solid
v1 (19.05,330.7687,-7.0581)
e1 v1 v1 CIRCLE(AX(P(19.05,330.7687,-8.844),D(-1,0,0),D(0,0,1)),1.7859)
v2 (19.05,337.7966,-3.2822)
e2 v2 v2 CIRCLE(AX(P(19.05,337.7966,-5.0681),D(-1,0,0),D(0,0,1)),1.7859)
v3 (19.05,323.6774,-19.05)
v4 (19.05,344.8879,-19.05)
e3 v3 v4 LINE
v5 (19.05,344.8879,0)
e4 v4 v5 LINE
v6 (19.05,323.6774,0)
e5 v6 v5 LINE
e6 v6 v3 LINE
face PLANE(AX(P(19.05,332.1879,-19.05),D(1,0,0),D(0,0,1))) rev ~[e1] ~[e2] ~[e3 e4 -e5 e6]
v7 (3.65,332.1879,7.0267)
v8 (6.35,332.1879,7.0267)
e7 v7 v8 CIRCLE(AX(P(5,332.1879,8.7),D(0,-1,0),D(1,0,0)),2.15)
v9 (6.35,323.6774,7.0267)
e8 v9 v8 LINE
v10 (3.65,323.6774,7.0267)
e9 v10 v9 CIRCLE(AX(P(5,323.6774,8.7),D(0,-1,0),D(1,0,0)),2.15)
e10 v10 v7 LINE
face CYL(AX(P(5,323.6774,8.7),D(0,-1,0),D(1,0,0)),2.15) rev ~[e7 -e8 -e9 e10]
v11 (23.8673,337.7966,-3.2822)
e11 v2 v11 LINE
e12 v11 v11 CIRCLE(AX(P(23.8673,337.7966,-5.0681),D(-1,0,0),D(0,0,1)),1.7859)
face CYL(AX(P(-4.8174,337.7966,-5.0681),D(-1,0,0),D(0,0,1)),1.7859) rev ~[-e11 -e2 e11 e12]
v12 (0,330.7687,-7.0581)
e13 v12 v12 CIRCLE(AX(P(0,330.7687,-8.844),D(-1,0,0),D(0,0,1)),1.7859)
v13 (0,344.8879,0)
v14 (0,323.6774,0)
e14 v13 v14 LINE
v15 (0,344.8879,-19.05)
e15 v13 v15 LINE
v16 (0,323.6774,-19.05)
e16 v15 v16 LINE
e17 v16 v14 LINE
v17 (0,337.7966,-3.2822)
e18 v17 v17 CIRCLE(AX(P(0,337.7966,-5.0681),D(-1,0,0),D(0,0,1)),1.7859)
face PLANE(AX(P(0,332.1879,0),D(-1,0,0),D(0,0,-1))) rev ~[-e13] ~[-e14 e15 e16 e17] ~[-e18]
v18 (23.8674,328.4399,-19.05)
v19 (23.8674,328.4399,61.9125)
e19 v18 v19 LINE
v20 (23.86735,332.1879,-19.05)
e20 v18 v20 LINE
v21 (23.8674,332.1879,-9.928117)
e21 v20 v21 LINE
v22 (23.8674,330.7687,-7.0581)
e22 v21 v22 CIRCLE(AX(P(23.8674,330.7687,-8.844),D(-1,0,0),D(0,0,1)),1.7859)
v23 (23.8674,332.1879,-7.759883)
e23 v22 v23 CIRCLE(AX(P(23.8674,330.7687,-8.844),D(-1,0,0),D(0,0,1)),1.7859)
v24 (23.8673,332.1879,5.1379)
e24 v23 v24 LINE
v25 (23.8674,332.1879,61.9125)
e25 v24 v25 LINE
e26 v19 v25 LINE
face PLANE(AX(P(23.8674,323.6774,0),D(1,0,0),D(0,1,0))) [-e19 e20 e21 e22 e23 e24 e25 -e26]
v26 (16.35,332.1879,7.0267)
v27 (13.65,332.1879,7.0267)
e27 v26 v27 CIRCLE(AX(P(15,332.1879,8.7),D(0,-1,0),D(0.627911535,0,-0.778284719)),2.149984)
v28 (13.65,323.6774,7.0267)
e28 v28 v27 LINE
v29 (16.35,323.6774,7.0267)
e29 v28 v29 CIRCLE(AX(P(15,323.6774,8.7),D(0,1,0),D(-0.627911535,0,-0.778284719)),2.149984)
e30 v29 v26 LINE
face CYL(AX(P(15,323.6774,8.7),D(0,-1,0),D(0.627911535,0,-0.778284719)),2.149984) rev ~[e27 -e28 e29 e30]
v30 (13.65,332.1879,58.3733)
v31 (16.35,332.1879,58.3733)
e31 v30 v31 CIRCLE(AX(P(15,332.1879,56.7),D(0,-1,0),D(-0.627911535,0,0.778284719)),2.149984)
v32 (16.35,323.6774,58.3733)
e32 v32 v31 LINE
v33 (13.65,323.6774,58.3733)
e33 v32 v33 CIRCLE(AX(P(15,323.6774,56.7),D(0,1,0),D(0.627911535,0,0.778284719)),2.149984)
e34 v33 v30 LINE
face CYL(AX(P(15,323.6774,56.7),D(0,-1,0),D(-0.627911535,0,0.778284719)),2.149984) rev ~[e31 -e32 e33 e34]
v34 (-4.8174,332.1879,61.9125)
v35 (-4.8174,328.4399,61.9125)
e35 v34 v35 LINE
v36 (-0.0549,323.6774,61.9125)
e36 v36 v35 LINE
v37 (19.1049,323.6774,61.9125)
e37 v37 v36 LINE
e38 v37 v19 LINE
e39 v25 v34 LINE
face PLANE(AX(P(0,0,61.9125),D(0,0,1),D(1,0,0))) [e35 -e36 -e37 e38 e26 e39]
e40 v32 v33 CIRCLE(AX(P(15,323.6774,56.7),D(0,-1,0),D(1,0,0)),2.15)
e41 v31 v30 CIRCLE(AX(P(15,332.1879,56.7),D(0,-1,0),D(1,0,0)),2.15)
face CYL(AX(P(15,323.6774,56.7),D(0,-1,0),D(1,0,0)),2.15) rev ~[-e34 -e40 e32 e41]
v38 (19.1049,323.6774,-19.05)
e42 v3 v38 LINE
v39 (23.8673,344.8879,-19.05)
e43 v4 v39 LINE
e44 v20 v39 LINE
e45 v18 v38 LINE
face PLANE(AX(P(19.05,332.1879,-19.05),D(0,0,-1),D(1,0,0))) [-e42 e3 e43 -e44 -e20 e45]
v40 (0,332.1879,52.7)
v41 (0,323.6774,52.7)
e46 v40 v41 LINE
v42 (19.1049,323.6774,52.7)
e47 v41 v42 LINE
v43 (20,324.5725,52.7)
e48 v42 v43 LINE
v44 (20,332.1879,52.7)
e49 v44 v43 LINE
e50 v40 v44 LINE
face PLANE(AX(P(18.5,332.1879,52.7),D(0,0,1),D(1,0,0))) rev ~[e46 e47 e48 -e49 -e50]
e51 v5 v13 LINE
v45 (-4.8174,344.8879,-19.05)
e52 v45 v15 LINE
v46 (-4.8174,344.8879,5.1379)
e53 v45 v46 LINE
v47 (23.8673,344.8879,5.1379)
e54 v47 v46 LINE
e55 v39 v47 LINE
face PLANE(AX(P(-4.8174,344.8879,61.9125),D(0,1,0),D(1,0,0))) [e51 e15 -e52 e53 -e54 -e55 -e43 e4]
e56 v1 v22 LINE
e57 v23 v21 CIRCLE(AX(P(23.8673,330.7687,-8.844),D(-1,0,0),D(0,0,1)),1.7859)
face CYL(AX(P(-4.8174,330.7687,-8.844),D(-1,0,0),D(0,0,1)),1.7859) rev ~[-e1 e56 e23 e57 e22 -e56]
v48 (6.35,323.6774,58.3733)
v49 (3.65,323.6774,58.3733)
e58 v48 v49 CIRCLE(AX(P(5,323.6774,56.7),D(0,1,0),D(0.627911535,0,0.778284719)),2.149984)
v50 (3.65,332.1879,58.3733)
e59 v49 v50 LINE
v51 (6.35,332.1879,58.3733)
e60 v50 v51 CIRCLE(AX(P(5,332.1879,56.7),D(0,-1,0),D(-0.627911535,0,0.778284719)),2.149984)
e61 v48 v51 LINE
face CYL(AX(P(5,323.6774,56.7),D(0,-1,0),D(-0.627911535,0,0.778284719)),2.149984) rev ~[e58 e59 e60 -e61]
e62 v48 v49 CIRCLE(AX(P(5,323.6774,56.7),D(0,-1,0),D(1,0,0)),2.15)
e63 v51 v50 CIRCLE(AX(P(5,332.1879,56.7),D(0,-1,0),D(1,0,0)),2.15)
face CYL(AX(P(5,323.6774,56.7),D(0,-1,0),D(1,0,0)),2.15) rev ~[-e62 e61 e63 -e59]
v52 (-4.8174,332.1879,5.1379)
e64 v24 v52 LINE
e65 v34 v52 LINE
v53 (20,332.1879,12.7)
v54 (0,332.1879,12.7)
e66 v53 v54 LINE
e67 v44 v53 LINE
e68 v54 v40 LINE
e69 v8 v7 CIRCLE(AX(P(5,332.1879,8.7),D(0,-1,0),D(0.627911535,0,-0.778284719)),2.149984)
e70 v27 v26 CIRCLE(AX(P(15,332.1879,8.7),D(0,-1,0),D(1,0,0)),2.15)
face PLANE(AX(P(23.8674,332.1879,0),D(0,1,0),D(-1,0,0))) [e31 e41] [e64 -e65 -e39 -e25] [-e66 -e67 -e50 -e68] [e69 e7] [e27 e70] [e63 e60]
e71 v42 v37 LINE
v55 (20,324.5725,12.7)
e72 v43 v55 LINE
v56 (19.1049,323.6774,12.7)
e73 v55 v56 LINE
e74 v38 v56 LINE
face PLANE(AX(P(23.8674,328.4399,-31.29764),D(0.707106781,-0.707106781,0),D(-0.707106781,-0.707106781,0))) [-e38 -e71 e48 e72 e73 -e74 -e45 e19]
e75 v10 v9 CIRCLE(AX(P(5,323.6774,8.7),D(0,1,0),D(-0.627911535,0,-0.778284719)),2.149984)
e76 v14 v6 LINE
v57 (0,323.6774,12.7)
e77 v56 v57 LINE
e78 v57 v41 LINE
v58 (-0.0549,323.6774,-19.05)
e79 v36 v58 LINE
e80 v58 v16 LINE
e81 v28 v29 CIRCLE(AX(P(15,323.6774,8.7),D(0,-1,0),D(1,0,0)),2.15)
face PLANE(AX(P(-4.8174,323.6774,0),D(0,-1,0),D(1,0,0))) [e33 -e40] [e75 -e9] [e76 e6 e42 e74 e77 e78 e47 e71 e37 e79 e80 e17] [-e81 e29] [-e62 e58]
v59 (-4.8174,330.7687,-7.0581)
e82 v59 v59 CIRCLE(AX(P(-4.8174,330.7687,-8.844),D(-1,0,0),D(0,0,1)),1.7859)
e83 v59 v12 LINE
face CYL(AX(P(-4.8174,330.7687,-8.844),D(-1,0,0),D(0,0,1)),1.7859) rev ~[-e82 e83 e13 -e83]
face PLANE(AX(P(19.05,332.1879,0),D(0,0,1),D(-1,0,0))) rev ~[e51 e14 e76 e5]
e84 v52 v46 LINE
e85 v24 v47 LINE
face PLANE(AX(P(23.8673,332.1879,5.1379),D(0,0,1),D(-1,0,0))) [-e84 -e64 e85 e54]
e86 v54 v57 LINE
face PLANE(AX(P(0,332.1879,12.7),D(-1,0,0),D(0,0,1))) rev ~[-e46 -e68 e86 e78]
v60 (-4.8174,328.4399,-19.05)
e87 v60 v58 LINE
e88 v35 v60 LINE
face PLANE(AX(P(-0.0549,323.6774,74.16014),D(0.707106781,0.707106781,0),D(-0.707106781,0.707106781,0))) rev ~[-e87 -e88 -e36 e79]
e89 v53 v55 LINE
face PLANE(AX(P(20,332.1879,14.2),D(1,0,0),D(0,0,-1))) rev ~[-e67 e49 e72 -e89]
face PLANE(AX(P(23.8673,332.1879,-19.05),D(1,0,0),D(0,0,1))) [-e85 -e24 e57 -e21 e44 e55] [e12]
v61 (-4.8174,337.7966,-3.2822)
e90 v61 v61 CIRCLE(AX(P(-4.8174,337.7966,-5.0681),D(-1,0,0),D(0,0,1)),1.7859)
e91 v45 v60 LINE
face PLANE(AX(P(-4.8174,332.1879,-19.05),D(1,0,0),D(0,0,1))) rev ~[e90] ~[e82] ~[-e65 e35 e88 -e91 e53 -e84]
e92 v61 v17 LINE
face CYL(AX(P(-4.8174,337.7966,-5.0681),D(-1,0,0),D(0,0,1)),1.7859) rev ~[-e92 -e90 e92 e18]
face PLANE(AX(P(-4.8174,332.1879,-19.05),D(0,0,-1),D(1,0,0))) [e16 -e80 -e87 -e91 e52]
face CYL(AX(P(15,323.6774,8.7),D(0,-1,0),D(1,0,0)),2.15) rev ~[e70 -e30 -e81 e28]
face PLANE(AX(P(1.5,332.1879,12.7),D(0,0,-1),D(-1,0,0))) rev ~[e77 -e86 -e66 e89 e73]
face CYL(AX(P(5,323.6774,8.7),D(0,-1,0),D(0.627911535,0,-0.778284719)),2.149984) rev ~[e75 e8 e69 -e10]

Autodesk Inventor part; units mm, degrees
ref_plane "YZ Plane" through (0, 0, 0) normal (1, 0, 0) x (0, 1, 0)
ref_plane "Work Plane1" through (0, 0, 0) normal (0, 0, 1) x (1, 0, 0)
ref_plane "Work Plane2" through (0, 0, 0) normal (0, 0, 1) x (1, 0, 0)
sketch "Sketch2" plane through (0, 0, 0) normal (0, 0, 1) x (1, 0, 0)
  line L0 (0, 0) -> (19.05, 0) projected
  line L1 (19.05, 0) -> (19.05, 431.8) construction
  line L2 (0, 431.8) -> (19.05, 431.8) projected
  line L3 (0, 0) -> (0, 431.8) construction
  line L4 (18.5, 323.6774) -> (1.5, 323.6774) projected
  line L5 (18.5, 323.6774) -> (19.1476, 323.6774)
  line L6 (1.5, 323.6774) -> (0, 323.6774)
  line L7 (-4.8174, 323.6774) -> (23.8674, 323.6774)
  line L8 (23.8674, 323.6774) -> (23.8674, 332.1879)
  line L9 (23.8674, 332.1879) -> (-4.8174, 332.1879)
  line L10 (-4.8174, 332.1879) -> (-4.8174, 323.6774)
  line L11 (9.525, 431.8) -> (9.525, 312.4258) construction
  line L12 (9.525, 327.9326) -> (-4.8174, 327.9326) construction
  line L13 (23.8674, 327.9326) -> (9.525, 327.9326) construction
extrude "Extrusion1" add sketch "Sketch2" along normal blind 61.9125
sketch "Sketch3" plane through (-4.8174, 323.6774, 0) normal (0, -1, 0) x (1, 0, 0)
  arc A0 (8.4674, 58.3733) -> (11.1674, 58.3733) centre (9.8174, 56.7) ccw projected
  arc A1 (18.4674, 58.3733) -> (21.1674, 58.3733) centre (19.8174, 56.7) ccw projected
  arc A2 (11.1674, 7.0267) -> (8.4674, 7.0267) centre (9.8174, 8.7) ccw projected
  arc A3 (21.1674, 7.0267) -> (18.4674, 7.0267) centre (19.8174, 8.7) ccw projected
  circle A4 centre (9.8174, 8.7) radius 2.15
  circle A5 centre (19.8174, 8.7) radius 2.15
  circle A6 centre (9.8174, 56.7) radius 2.15
  circle A7 centre (19.8174, 56.7) radius 2.15
  point P0 (4.8174, 0)
extrude "Extrusion2" cut sketch "Sketch3" against normal through all
sketch "Sketch4" plane through (-4.8174, 332.1879, 0) normal (0, 1, 0) x (1, 0, 0)
  line L0 (4.8174, -14.2) -> (4.8174, -51.2) projected
  line L1 (6.3174, -52.7) -> (23.3174, -52.7) projected
  line L2 (24.8174, -51.2) -> (24.8174, -14.2) projected
  line L3 (23.3174, -12.7) -> (6.3174, -12.7) projected
  line L4 (4.8174, -52.7) -> (24.8174, -52.7)
  line L5 (24.8174, -52.7) -> (24.8174, -12.7)
  line L6 (24.8174, -12.7) -> (4.8174, -12.7)
  line L7 (4.8174, -12.7) -> (4.8174, -52.7)
  point P0 (4.8174, 0)
extrude "Extrusion3" cut sketch "Sketch4" against normal through all
sketch "Sketch6" plane through (0, 0, 0) normal (0, 0, -1) x (-1, 0, 0)
  line L0 (4.8174, 323.6774) -> (-23.8674, 323.6774) projected
  line L1 (4.8174, 332.1879) -> (4.8174, 323.6774) projected
  line L2 (-23.8674, 332.1879) -> (4.8174, 332.1879) projected
  line L3 (-23.8674, 323.6774) -> (-23.8674, 332.1879) projected
  point P0 (0, 0)
extrude "Extrusion4" add sketch "Sketch6" along normal blind 19.05
sketch "Sketch7" plane through (-4.8174, 332.1879, 61.9125) normal (0, 1, 0) x (1, 0, 0)
  line L0 (4.8174, 70.6755) -> (4.8174, 80.9625) projected
  line L1 (4.8174, 61.9125) -> (4.8174, 70.6755) projected
  line L2 (23.8674, 61.9125) -> (23.8674, 70.6755) projected
  line L3 (23.8674, 71.4375) -> (23.8674, 80.9625) projected
  line L4 (23.8674, 61.9125) -> (4.8174, 61.9125)
  line L5 (4.8174, 61.9125) -> (4.8174, 80.9625)
  line L6 (4.8174, 80.9625) -> (23.8674, 80.9625)
  line L7 (23.8674, 80.9625) -> (23.8674, 61.9125)
extrude "Extrusion5" cut sketch "Sketch7" against normal through all
sketch "Sketch8" plane through (-4.8174, 332.1879, 61.9125) normal (0, 1, 0) x (1, 0, 0)
  line L0 (28.6847, 80.9625) -> (28.6847, 0) projected
  line L1 (0, 80.9625) -> (0, 0) projected
  line L2 (4.8174, 61.9125) -> (4.8174, 80.9625) projected
  line L3 (0, 80.9625) -> (4.8174, 80.9625) projected
  line L4 (0, 80.9625) -> (0, 0) projected
  line L5 (28.6847, 0) -> (0, 0) projected
  line L6 (28.6847, 80.9625) -> (28.6847, 0) projected
  line L7 (23.8674, 80.9625) -> (28.6847, 80.9625) projected
  line L8 (23.8674, 80.9625) -> (23.8674, 61.9125) projected
  line L9 (23.8674, 61.9125) -> (4.8174, 61.9125) projected
  line L10 (24.8174, 49.2125) -> (24.8174, 9.2125) projected
  line L11 (24.8174, 9.2125) -> (4.8174, 9.2125) projected
  line L12 (4.8174, 9.2125) -> (4.8174, 49.2125) projected
  line L13 (4.8174, 49.2125) -> (24.8174, 49.2125) projected
  circle A0 centre (9.8174, 5.2125) radius 2.15 projected
  circle A1 centre (9.8174, 53.2125) radius 2.15 projected
  circle A2 centre (19.8174, 53.2125) radius 2.15 projected
  circle A3 centre (19.8174, 5.2125) radius 2.15 projected
  line L14 (28.6847, 56.7746) -> (0, 56.7746)
  line L15 (28.6847, 56.7746) -> (57.3695, 56.7746) construction
  point P0 (4.8174, 61.9125)
  dimension "d10" = 180
extrude "Extrusion6" add sketch "Sketch8" along normal blind 12.7 contours L0 L14 L1 L3 L2 L9 L8 L7
sketch "Sketch10" plane through (23.8674, 323.6774, 61.9125) normal (1, 0, 0) x (0, 0, -1)
  point P0 (61.9125, -323.6774)
sketch "Sketch11" plane through (-4.8174, 323.6774, 61.9125) normal (-1, 0, 0) x (0, 0, 1)
  line L0 (0, 0) -> (-80.9625, 0) projected
  line L1 (0, 8.5105) -> (0, 0) projected
  line L2 (-56.7746, 8.5105) -> (0, 8.5105) projected
  line L3 (-56.7746, 8.5105) -> (-56.7746, 21.2105) projected
  line L4 (-80.9625, 21.2105) -> (-56.7746, 21.2105) projected
  line L5 (-80.9625, 0) -> (-80.9625, 21.2105) projected
  circle A0 centre (-66.9806, 14.1192) radius 1.7859
  circle A1 centre (-70.7565, 7.0913) radius 1.7859
  line L6 (-66.9806, 14.1192) -> (-66.9806, 21.2105) construction
  line L7 (-70.7565, 7.0913) -> (-70.7565, 0) construction
  line L8 (-80.9625, 0) -> (0, 0) construction
  line L9 (-70.7565, 7.0913) -> (-80.9625, 7.0913) construction
  line L10 (-80.9625, 0) -> (-80.9625, 21.2105) construction
  line L11 (-66.9806, 14.1192) -> (-56.7746, 14.1192) construction
  point P0 (-61.9125, -323.6774)
  dimension "d13" = 3.5719
  dimension "d14" = 3.5719
extrude "Extrusion7" cut sketch "Sketch11" against normal through all contours A0 | A1
chamfer "Chamfer1" distance 4.7625 angle 45 2 edges at (23.8674, 323.6774, 21.4312) (-4.8174, 323.6774, 21.4312)
properties part number "servo mount"
